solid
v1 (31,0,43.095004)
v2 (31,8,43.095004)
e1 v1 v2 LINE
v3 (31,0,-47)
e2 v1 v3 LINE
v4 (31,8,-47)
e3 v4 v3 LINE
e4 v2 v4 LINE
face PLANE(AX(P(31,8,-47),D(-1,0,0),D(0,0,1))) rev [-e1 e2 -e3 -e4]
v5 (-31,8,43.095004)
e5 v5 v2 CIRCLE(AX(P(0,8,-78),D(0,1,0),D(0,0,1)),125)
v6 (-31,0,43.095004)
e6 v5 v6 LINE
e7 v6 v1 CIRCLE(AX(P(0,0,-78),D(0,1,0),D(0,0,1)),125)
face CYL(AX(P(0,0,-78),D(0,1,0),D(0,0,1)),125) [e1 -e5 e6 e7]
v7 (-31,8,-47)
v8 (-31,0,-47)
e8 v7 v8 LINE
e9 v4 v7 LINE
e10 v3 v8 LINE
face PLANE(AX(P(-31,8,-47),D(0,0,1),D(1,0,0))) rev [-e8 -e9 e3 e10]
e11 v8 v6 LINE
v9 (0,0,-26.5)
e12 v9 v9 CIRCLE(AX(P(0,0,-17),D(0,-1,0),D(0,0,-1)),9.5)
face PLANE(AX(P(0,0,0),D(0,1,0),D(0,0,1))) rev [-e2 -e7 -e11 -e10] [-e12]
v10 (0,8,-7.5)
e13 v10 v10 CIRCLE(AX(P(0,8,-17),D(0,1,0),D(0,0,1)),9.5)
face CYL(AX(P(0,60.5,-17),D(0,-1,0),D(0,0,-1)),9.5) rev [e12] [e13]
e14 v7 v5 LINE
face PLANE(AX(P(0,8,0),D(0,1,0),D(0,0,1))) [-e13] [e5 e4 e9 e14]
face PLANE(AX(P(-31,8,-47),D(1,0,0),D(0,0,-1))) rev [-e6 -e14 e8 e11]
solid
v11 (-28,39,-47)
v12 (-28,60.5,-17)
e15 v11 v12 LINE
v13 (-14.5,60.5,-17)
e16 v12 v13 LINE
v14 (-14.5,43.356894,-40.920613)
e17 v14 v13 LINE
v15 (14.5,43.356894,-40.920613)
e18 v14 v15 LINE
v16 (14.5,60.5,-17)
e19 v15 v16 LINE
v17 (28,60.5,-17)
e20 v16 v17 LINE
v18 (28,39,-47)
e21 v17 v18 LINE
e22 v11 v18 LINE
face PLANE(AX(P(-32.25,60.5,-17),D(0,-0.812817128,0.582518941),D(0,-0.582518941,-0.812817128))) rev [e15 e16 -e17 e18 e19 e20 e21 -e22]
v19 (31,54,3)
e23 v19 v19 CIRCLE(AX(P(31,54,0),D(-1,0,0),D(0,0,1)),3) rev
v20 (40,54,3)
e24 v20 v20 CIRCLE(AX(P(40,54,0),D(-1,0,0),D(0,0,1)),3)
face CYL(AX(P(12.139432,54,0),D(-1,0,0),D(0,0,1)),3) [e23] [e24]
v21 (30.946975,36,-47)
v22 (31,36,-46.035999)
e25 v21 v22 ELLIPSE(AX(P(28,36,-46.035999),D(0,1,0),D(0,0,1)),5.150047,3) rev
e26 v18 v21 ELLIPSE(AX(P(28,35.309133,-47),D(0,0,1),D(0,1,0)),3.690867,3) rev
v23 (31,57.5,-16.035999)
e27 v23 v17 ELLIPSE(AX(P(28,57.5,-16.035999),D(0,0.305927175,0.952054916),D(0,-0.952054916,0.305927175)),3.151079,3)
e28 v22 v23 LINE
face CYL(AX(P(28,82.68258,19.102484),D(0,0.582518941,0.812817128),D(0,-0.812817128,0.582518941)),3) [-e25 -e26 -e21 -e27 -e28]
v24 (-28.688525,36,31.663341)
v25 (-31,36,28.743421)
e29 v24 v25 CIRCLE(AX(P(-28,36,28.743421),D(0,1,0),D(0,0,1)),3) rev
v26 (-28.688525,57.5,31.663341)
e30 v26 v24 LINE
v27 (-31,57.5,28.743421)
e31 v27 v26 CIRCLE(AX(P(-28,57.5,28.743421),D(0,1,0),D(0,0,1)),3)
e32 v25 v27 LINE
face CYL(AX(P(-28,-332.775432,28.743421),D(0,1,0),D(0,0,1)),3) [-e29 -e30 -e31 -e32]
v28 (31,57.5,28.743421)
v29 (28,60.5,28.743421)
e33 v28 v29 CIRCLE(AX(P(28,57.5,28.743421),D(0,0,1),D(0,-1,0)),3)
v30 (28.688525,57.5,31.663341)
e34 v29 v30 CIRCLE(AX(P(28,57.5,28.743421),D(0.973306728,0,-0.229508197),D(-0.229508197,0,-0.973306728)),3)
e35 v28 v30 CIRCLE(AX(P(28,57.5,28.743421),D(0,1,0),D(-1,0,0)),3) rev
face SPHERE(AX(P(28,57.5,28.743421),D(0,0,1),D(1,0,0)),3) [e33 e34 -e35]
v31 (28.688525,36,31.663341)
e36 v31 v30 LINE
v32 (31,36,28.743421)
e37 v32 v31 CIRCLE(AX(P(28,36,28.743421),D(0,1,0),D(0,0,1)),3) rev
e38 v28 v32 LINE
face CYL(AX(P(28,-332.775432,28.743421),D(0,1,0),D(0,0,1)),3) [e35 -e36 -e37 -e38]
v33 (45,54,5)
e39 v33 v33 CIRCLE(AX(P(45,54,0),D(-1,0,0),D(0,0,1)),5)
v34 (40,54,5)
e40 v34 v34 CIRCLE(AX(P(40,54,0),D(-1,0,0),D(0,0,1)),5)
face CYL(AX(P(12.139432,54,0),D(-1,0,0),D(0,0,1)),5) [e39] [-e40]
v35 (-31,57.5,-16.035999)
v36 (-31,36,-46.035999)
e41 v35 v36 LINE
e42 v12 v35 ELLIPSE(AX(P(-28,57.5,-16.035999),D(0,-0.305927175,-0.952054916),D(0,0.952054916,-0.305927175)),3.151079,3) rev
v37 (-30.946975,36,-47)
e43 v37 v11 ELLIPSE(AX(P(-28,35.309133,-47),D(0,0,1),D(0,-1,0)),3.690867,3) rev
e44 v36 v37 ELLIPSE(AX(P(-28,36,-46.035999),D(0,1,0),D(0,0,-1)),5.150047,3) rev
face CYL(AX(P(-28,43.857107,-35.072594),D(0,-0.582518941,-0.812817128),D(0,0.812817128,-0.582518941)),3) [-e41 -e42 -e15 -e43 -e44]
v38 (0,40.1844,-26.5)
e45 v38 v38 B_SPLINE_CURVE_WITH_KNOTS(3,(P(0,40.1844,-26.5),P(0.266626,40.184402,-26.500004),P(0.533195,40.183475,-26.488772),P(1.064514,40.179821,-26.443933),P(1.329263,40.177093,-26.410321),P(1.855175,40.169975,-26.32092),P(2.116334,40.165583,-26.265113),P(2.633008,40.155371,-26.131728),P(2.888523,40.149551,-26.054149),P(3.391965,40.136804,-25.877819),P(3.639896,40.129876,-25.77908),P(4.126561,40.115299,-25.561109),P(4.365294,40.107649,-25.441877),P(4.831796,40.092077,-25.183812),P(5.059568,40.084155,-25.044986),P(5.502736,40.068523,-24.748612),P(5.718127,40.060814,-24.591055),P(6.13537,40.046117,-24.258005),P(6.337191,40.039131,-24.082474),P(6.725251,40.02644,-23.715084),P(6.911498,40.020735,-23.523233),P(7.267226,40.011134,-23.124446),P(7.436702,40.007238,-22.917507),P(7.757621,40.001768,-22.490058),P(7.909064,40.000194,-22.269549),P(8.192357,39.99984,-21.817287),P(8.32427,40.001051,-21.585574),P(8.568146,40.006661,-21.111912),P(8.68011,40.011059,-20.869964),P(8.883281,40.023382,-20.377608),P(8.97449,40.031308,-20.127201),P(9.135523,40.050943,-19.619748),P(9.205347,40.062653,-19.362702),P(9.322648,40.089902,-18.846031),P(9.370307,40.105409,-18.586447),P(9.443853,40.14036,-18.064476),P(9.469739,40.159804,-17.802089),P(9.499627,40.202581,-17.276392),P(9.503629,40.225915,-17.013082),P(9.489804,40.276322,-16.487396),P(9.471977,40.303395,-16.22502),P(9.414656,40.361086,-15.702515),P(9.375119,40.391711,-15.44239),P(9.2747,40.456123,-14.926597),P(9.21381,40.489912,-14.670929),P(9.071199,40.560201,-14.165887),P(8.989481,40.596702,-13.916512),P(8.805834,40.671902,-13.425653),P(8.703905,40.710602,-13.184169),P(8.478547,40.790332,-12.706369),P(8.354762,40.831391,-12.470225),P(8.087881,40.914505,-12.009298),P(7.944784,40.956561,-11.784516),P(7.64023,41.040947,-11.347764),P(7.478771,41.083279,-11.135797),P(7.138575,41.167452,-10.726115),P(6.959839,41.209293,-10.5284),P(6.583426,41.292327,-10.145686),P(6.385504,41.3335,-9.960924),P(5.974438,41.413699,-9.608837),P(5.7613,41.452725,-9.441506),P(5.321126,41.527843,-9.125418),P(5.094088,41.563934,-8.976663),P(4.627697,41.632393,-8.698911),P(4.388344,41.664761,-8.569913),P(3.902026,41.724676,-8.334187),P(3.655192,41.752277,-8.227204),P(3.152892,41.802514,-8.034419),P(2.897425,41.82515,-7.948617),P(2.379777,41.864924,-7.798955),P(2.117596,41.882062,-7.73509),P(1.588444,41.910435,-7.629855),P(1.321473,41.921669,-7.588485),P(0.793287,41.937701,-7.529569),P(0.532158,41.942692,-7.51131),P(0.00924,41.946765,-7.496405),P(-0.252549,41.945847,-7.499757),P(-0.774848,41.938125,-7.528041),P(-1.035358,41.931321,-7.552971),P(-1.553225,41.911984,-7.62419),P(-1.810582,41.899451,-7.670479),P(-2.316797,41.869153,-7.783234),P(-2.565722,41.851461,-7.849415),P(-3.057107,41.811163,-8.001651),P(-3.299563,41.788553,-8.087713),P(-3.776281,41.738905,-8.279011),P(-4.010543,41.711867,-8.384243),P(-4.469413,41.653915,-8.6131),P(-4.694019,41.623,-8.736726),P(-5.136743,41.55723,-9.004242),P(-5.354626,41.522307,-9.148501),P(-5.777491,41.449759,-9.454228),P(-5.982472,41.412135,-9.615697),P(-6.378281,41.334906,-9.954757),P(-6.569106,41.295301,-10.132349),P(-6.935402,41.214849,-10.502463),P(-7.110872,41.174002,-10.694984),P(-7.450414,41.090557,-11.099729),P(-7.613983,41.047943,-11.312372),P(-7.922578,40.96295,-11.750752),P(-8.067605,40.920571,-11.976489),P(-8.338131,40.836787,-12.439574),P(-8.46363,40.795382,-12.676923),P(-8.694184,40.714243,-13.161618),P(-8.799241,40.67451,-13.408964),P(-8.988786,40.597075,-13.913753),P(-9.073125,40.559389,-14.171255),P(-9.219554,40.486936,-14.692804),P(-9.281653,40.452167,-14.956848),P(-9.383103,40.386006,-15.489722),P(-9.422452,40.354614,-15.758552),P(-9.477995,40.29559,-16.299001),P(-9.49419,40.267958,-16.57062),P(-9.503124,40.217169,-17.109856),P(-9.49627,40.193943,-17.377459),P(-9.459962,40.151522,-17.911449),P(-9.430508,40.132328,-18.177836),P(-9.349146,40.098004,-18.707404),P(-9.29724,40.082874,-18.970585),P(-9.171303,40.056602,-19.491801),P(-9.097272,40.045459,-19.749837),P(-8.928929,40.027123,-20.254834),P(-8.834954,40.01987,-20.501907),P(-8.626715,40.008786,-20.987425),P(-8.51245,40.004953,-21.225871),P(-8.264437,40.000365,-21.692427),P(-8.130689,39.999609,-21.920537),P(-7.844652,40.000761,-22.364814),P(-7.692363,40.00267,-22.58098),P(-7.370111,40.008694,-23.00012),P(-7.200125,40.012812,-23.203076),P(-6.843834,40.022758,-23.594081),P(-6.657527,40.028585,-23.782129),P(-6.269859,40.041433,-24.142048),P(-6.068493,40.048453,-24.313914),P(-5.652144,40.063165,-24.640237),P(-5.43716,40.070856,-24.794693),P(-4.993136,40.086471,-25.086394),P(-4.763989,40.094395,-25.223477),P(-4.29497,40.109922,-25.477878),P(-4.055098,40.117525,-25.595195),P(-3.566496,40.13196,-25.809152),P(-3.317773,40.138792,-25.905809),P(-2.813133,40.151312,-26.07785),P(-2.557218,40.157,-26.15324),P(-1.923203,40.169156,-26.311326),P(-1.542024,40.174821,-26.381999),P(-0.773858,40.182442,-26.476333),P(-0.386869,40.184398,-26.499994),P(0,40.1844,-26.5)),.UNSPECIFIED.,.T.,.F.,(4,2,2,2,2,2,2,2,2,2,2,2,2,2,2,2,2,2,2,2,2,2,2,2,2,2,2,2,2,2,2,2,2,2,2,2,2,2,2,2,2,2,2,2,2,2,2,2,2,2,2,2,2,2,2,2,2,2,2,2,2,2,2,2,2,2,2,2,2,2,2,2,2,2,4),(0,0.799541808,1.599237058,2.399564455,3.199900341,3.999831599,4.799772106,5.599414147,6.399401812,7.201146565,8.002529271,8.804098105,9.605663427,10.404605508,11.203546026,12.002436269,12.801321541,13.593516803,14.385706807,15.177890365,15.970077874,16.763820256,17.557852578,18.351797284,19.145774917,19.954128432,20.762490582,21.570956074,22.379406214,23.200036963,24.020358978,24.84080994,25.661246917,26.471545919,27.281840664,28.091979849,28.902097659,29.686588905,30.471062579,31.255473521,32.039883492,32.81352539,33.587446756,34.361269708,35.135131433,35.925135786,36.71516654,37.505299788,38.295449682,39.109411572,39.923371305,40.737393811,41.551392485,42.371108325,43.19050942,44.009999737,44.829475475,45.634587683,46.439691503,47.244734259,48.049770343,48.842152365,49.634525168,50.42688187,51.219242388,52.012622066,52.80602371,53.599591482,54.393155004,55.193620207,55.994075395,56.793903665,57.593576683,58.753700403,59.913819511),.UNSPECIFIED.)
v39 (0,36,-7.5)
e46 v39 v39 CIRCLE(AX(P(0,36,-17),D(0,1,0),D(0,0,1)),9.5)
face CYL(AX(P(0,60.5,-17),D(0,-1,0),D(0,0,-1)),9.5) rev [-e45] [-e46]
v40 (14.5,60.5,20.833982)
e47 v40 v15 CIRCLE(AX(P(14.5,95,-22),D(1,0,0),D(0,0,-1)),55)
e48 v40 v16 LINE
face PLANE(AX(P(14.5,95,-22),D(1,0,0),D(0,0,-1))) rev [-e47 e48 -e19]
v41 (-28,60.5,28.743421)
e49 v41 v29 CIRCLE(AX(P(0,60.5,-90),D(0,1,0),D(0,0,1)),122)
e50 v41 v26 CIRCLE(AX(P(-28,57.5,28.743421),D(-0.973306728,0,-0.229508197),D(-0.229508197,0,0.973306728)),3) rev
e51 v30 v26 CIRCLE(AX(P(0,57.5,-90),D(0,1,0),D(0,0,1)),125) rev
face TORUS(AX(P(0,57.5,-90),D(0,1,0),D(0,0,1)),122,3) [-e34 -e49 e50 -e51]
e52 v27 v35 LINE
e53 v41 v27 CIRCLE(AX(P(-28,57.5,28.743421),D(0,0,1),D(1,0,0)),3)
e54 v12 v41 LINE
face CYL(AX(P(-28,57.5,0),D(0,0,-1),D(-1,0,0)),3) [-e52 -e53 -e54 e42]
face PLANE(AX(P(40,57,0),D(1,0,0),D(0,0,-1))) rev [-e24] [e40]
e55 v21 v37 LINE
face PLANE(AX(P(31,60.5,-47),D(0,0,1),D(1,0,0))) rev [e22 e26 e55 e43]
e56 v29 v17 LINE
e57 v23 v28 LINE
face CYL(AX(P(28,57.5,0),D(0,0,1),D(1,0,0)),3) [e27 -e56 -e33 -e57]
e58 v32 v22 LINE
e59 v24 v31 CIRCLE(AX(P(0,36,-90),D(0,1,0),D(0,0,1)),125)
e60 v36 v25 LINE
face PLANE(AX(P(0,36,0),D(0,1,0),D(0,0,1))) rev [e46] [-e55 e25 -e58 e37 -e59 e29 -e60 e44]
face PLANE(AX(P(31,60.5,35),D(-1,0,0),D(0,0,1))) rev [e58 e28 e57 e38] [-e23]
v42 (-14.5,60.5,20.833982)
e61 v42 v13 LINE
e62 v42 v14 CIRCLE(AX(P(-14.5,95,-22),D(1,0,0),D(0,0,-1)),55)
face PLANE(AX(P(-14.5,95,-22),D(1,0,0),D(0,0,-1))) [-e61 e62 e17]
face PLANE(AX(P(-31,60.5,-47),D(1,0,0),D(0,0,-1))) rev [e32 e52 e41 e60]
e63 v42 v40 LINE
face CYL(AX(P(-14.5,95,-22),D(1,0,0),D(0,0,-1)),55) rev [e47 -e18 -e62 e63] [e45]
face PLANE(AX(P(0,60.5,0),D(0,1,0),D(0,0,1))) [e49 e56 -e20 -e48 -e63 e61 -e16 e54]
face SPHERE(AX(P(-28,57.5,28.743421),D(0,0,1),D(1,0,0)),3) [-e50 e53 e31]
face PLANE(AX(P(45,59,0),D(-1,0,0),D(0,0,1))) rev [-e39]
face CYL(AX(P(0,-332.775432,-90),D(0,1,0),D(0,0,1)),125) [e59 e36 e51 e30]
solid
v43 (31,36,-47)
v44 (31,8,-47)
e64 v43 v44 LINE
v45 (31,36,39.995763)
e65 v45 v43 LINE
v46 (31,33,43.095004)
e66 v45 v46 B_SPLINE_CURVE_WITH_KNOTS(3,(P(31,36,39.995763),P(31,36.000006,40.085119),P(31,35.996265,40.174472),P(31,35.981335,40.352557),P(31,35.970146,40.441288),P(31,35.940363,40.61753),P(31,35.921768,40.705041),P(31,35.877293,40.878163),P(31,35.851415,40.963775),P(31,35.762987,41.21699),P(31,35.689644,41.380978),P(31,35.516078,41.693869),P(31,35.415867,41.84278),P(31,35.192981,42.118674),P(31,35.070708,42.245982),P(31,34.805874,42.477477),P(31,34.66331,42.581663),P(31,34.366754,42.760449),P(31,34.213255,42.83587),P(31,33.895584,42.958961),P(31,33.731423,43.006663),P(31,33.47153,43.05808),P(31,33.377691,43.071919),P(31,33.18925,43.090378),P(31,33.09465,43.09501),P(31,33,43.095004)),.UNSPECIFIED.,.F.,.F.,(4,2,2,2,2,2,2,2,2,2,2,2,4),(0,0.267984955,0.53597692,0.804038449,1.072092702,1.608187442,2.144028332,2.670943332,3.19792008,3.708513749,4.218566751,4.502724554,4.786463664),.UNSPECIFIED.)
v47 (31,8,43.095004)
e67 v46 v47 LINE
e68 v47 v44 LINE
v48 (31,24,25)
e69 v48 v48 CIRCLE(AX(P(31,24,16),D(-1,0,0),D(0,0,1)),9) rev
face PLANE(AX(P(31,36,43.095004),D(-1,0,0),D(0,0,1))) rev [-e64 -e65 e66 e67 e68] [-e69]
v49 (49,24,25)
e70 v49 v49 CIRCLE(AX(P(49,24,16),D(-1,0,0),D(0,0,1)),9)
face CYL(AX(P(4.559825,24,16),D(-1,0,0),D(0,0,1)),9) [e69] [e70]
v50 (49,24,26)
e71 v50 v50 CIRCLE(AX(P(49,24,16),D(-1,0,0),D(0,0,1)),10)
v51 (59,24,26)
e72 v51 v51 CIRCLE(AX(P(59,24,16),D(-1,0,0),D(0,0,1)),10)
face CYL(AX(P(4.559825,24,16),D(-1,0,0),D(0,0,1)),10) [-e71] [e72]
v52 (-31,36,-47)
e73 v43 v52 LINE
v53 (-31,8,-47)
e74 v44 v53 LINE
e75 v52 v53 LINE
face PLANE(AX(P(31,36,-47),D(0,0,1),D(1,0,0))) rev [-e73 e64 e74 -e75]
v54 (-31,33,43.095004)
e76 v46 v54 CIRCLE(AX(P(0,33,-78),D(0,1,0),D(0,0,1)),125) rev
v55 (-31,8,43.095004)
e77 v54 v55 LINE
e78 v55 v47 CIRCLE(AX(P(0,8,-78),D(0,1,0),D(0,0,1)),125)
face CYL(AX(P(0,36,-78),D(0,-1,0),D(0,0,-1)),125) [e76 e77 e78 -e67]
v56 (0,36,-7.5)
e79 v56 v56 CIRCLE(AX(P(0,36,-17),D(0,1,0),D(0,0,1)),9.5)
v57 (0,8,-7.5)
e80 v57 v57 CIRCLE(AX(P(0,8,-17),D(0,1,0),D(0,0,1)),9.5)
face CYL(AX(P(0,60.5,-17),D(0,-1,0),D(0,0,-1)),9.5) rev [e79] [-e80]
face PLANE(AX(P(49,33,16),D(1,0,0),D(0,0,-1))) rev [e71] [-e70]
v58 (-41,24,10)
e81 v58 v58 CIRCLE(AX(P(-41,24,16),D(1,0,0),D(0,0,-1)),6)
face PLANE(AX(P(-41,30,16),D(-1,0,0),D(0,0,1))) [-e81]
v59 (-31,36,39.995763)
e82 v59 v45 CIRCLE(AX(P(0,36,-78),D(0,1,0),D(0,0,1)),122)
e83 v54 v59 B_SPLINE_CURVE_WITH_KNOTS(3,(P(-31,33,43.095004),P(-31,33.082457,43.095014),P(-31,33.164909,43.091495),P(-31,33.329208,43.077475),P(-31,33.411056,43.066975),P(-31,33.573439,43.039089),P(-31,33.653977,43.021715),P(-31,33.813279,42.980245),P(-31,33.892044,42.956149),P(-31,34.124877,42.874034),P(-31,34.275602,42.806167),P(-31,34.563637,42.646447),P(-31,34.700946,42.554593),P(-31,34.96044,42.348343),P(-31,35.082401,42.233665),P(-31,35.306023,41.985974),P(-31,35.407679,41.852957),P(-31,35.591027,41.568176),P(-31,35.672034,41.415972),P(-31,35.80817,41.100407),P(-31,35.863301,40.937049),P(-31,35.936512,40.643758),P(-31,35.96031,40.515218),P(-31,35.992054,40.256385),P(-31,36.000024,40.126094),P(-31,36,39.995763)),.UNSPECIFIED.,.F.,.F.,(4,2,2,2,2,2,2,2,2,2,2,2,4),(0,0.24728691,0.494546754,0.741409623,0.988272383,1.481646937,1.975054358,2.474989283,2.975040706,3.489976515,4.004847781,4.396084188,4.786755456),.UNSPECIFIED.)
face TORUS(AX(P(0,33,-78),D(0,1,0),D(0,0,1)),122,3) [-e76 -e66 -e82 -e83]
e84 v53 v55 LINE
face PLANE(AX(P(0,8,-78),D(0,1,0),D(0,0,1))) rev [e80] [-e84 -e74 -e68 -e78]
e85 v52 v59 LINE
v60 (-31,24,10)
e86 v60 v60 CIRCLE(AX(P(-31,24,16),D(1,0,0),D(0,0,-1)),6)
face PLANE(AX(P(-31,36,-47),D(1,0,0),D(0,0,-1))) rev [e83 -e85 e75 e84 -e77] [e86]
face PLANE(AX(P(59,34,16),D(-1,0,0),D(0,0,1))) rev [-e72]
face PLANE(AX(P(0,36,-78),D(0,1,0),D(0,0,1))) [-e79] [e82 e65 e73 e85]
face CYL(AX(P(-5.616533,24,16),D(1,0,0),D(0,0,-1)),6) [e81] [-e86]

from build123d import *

# Parameters (mm, degrees)
SKIZZE1_W                       = 62
SKIZZE1_H                       = 94
AUFSATZ_LINEAR_AUSTRAGEN1_DEPTH = 8
SCHNITT_LINEAR_START            = -8
SCHNITT_LINEAR_AUSTRAGEN1_DEPTH = 8
AUFSATZ_LINEAR_AUSTRAGEN2_DEPTH = 28
SKIZZE4_W                       = 62
SKIZZE4_H                       = 82
AUFSATZ_LINEAR_AUSTRAGEN3_DEPTH = 24.5
SCHNITT_LINEAR_START_2          = -24.5
SCHNITT_LINEAR_AUSTRAGEN2_DEPTH = 24.5
SCHNITT_LINEAR_AUSTRAGEN3_DEPTH = 32.25
SKIZZE7_R                       = 55
SCHNITT_LINEAR_AUSTRAGEN4_DEPTH = 14.5
VERRUNDUNG1_R                   = 3
VERRUNDUNG2_R                   = 3
SKIZZE12_W                      = 10
SKIZZE12_H                      = 6
SKIZZE14_R                      = 9.5
SCHNITT_LINEAR_AUSTRAGEN5_DEPTH = 97.696690788


# Read off the part's stored shape, not the designer's step: Schnitt-Linear austragen1, Schnitt-Linear austragen2
with BuildPart() as part:
    # Skizze1 → Aufsatz-Linear austragen1 (new body)
    with BuildSketch(Plane(origin=(0, 0, 0), x_dir=(1, 0, 0), z_dir=(0, 1, 0))):
        Rectangle(SKIZZE1_W, SKIZZE1_H)
    extrude(amount=AUFSATZ_LINEAR_AUSTRAGEN1_DEPTH)

    # Schnitt-Linear austragen1 outline → Schnitt-Linear austragen1 (cut)
    with BuildSketch(Plane(origin=(0, 8, 0), x_dir=(1, 0, 0), z_dir=(0, 1, 0)).offset(SCHNITT_LINEAR_START)):
        with BuildLine():
            ThreePointArc((31, -43.095004026), (15.622491747, -46.019908691), (0, -47))
            Line((0, -47), (31, -47))
            Line((31, -47), (31, -43.095004026))
        make_face()
        with BuildLine():
            ThreePointArc((0, -47), (-15.622491747, -46.019908691), (-31, -43.095004026))
            Line((-31, -43.095004026), (-31, -47))
            Line((-31, -47), (0, -47))
        make_face()
    extrude(amount=SCHNITT_LINEAR_AUSTRAGEN1_DEPTH, mode=Mode.SUBTRACT)


with BuildPart() as body_2:
    # Skizze3 → Aufsatz-Linear austragen2 (new body)
    with BuildSketch(Plane(origin=(0, 8, 0), x_dir=(1, 0, 0), z_dir=(0, 1, 0))):
        with BuildLine():
            Line((-31, 47), (-31, -43.095004026))
            ThreePointArc((-31, -43.095004026), (0, -47), (31, -43.095004026))
            Line((31, -43.095004026), (31, 47))
            Line((31, 47), (-31, 47))
        make_face()
    extrude(amount=AUFSATZ_LINEAR_AUSTRAGEN2_DEPTH)

    # Verrundung1
    verrundung1_edges = [body_2.edges().sort_by_distance(p)[0] for p in [
        (0, 36, 47),
    ]]
    fillet(verrundung1_edges, radius=VERRUNDUNG1_R)

    # Skizze11 → Rotation2 (revolve)
    with BuildSketch(Plane.XY.offset(16), mode=Mode.PRIVATE) as rotation2_sk:
        Polygon((31, 24), (31, 33), (49, 33), (49, 34), (59, 34), (59, 24), align=None)
    revolve(rotation2_sk.sketch.rotate(Axis((4.559824511, 24, 16), (1, 0, 0)), 90), axis=Axis((4.559824511, 24, 16), (1, 0, 0)))

    # Skizze12 → Rotation3 (revolve)
    with BuildSketch(Plane.XY.offset(16), mode=Mode.PRIVATE) as rotation3_sk:
        with Locations((-36, 27)):
            Rectangle(SKIZZE12_W, SKIZZE12_H)
    revolve(rotation3_sk.sketch.rotate(Axis((-5.61653293, 24, 16), (-1, 0, 0)), 90), axis=Axis((-5.61653293, 24, 16), (-1, 0, 0)))


with BuildPart() as body_3:
    # Skizze4 → Aufsatz-Linear austragen3 (new body)
    with BuildSketch(Plane(origin=(0, 36, 0), x_dir=(1, 0, 0), z_dir=(0, 1, 0))):
        with Locations((0, 6)):
            Rectangle(SKIZZE4_W, SKIZZE4_H)
    extrude(amount=AUFSATZ_LINEAR_AUSTRAGEN3_DEPTH)

    # Schnitt-Linear austragen2 outline → Schnitt-Linear austragen2 (cut)
    with BuildSketch(Plane(origin=(0, 60.5, 0), x_dir=(1, 0, 0), z_dir=(0, 1, 0)).offset(SCHNITT_LINEAR_START_2)):
        with BuildLine():
            ThreePointArc((31, -31.095004026), (15.622491747, -34.019908691), (0, -35))
            Line((0, -35), (31, -35))
            Line((31, -35), (31, -31.095004026))
        make_face()
        with BuildLine():
            ThreePointArc((0, -35), (-15.622491747, -34.019908691), (-31, -31.095004026))
            Line((-31, -31.095004026), (-31, -35))
            Line((-31, -35), (0, -35))
        make_face()
    extrude(amount=SCHNITT_LINEAR_AUSTRAGEN2_DEPTH, mode=Mode.SUBTRACT)

    # Skizze6 → Schnitt-Linear austragen3 (cut, symmetric)
    with BuildSketch(Plane(origin=(0, 0, 0), x_dir=(0, 0, -1), z_dir=(1, 0, 0))):
        Polygon((47, 60.5), (17, 60.5), (47, 39), align=None)
    extrude(amount=SCHNITT_LINEAR_AUSTRAGEN3_DEPTH, both=True, mode=Mode.SUBTRACT)

    # Skizze7 → Schnitt-Linear austragen4 (cut, symmetric)
    with BuildSketch(Plane(origin=(0, 0, 0), x_dir=(0, 0, -1), z_dir=(1, 0, 0))):
        with Locations((22, 95)):
            Circle(SKIZZE7_R)
    extrude(amount=SCHNITT_LINEAR_AUSTRAGEN4_DEPTH, both=True, mode=Mode.SUBTRACT)

    # Verrundung2
    verrundung2_edges = [body_3.edges().sort_by_distance(p)[0] for p in [
        (-31, 49.75, -32),
        (31, 49.75, -32),
        (31, 60.5, 7.047502013),
        (-15.622491747, 60.5, 34.019908691),
        (-31, 60.5, 7.047502013),
        (-31, 48.25, 31.095004026),
        (31, 48.25, 31.095004026),
    ]]
    fillet(verrundung2_edges, radius=VERRUNDUNG2_R)

    # Skizze10 → Rotation1 (revolve)
    with BuildSketch(Plane.XY, mode=Mode.PRIVATE) as rotation1_sk:
        Polygon((31, 54), (31, 57), (40, 57), (40, 59), (45, 59), (45, 54), align=None)
    revolve(rotation1_sk.sketch.rotate(Axis((12.139432052, 54, 0), (1, 0, 0)), 90), axis=Axis((12.139432052, 54, 0), (1, 0, 0)))


with BuildPart() as schnitt_linear_austragen5_tool:
    # Skizze14 → Schnitt-Linear austragen5 (new, through all)
    with BuildSketch(Plane.XZ):
        with Locations(Location((0, -17, 0), (0, 0, 270))):
            Circle(SKIZZE14_R)
    extrude(amount=-SCHNITT_LINEAR_AUSTRAGEN5_DEPTH)


with BuildPart() as part_1:
    add(part.part)

    # Schnitt-Linear austragen5: cut by schnitt_linear_austragen5_tool
    add(schnitt_linear_austragen5_tool.part, mode=Mode.SUBTRACT)


with BuildPart() as body_2_1:
    add(body_2.part)

    # Schnitt-Linear austragen5: cut by schnitt_linear_austragen5_tool
    add(schnitt_linear_austragen5_tool.part, mode=Mode.SUBTRACT)


with BuildPart() as body_3_1:
    add(body_3.part)

    # Schnitt-Linear austragen5: cut by schnitt_linear_austragen5_tool
    add(schnitt_linear_austragen5_tool.part, mode=Mode.SUBTRACT)


solid = Compound([part_1.part, body_2_1.part, body_3_1.part])
